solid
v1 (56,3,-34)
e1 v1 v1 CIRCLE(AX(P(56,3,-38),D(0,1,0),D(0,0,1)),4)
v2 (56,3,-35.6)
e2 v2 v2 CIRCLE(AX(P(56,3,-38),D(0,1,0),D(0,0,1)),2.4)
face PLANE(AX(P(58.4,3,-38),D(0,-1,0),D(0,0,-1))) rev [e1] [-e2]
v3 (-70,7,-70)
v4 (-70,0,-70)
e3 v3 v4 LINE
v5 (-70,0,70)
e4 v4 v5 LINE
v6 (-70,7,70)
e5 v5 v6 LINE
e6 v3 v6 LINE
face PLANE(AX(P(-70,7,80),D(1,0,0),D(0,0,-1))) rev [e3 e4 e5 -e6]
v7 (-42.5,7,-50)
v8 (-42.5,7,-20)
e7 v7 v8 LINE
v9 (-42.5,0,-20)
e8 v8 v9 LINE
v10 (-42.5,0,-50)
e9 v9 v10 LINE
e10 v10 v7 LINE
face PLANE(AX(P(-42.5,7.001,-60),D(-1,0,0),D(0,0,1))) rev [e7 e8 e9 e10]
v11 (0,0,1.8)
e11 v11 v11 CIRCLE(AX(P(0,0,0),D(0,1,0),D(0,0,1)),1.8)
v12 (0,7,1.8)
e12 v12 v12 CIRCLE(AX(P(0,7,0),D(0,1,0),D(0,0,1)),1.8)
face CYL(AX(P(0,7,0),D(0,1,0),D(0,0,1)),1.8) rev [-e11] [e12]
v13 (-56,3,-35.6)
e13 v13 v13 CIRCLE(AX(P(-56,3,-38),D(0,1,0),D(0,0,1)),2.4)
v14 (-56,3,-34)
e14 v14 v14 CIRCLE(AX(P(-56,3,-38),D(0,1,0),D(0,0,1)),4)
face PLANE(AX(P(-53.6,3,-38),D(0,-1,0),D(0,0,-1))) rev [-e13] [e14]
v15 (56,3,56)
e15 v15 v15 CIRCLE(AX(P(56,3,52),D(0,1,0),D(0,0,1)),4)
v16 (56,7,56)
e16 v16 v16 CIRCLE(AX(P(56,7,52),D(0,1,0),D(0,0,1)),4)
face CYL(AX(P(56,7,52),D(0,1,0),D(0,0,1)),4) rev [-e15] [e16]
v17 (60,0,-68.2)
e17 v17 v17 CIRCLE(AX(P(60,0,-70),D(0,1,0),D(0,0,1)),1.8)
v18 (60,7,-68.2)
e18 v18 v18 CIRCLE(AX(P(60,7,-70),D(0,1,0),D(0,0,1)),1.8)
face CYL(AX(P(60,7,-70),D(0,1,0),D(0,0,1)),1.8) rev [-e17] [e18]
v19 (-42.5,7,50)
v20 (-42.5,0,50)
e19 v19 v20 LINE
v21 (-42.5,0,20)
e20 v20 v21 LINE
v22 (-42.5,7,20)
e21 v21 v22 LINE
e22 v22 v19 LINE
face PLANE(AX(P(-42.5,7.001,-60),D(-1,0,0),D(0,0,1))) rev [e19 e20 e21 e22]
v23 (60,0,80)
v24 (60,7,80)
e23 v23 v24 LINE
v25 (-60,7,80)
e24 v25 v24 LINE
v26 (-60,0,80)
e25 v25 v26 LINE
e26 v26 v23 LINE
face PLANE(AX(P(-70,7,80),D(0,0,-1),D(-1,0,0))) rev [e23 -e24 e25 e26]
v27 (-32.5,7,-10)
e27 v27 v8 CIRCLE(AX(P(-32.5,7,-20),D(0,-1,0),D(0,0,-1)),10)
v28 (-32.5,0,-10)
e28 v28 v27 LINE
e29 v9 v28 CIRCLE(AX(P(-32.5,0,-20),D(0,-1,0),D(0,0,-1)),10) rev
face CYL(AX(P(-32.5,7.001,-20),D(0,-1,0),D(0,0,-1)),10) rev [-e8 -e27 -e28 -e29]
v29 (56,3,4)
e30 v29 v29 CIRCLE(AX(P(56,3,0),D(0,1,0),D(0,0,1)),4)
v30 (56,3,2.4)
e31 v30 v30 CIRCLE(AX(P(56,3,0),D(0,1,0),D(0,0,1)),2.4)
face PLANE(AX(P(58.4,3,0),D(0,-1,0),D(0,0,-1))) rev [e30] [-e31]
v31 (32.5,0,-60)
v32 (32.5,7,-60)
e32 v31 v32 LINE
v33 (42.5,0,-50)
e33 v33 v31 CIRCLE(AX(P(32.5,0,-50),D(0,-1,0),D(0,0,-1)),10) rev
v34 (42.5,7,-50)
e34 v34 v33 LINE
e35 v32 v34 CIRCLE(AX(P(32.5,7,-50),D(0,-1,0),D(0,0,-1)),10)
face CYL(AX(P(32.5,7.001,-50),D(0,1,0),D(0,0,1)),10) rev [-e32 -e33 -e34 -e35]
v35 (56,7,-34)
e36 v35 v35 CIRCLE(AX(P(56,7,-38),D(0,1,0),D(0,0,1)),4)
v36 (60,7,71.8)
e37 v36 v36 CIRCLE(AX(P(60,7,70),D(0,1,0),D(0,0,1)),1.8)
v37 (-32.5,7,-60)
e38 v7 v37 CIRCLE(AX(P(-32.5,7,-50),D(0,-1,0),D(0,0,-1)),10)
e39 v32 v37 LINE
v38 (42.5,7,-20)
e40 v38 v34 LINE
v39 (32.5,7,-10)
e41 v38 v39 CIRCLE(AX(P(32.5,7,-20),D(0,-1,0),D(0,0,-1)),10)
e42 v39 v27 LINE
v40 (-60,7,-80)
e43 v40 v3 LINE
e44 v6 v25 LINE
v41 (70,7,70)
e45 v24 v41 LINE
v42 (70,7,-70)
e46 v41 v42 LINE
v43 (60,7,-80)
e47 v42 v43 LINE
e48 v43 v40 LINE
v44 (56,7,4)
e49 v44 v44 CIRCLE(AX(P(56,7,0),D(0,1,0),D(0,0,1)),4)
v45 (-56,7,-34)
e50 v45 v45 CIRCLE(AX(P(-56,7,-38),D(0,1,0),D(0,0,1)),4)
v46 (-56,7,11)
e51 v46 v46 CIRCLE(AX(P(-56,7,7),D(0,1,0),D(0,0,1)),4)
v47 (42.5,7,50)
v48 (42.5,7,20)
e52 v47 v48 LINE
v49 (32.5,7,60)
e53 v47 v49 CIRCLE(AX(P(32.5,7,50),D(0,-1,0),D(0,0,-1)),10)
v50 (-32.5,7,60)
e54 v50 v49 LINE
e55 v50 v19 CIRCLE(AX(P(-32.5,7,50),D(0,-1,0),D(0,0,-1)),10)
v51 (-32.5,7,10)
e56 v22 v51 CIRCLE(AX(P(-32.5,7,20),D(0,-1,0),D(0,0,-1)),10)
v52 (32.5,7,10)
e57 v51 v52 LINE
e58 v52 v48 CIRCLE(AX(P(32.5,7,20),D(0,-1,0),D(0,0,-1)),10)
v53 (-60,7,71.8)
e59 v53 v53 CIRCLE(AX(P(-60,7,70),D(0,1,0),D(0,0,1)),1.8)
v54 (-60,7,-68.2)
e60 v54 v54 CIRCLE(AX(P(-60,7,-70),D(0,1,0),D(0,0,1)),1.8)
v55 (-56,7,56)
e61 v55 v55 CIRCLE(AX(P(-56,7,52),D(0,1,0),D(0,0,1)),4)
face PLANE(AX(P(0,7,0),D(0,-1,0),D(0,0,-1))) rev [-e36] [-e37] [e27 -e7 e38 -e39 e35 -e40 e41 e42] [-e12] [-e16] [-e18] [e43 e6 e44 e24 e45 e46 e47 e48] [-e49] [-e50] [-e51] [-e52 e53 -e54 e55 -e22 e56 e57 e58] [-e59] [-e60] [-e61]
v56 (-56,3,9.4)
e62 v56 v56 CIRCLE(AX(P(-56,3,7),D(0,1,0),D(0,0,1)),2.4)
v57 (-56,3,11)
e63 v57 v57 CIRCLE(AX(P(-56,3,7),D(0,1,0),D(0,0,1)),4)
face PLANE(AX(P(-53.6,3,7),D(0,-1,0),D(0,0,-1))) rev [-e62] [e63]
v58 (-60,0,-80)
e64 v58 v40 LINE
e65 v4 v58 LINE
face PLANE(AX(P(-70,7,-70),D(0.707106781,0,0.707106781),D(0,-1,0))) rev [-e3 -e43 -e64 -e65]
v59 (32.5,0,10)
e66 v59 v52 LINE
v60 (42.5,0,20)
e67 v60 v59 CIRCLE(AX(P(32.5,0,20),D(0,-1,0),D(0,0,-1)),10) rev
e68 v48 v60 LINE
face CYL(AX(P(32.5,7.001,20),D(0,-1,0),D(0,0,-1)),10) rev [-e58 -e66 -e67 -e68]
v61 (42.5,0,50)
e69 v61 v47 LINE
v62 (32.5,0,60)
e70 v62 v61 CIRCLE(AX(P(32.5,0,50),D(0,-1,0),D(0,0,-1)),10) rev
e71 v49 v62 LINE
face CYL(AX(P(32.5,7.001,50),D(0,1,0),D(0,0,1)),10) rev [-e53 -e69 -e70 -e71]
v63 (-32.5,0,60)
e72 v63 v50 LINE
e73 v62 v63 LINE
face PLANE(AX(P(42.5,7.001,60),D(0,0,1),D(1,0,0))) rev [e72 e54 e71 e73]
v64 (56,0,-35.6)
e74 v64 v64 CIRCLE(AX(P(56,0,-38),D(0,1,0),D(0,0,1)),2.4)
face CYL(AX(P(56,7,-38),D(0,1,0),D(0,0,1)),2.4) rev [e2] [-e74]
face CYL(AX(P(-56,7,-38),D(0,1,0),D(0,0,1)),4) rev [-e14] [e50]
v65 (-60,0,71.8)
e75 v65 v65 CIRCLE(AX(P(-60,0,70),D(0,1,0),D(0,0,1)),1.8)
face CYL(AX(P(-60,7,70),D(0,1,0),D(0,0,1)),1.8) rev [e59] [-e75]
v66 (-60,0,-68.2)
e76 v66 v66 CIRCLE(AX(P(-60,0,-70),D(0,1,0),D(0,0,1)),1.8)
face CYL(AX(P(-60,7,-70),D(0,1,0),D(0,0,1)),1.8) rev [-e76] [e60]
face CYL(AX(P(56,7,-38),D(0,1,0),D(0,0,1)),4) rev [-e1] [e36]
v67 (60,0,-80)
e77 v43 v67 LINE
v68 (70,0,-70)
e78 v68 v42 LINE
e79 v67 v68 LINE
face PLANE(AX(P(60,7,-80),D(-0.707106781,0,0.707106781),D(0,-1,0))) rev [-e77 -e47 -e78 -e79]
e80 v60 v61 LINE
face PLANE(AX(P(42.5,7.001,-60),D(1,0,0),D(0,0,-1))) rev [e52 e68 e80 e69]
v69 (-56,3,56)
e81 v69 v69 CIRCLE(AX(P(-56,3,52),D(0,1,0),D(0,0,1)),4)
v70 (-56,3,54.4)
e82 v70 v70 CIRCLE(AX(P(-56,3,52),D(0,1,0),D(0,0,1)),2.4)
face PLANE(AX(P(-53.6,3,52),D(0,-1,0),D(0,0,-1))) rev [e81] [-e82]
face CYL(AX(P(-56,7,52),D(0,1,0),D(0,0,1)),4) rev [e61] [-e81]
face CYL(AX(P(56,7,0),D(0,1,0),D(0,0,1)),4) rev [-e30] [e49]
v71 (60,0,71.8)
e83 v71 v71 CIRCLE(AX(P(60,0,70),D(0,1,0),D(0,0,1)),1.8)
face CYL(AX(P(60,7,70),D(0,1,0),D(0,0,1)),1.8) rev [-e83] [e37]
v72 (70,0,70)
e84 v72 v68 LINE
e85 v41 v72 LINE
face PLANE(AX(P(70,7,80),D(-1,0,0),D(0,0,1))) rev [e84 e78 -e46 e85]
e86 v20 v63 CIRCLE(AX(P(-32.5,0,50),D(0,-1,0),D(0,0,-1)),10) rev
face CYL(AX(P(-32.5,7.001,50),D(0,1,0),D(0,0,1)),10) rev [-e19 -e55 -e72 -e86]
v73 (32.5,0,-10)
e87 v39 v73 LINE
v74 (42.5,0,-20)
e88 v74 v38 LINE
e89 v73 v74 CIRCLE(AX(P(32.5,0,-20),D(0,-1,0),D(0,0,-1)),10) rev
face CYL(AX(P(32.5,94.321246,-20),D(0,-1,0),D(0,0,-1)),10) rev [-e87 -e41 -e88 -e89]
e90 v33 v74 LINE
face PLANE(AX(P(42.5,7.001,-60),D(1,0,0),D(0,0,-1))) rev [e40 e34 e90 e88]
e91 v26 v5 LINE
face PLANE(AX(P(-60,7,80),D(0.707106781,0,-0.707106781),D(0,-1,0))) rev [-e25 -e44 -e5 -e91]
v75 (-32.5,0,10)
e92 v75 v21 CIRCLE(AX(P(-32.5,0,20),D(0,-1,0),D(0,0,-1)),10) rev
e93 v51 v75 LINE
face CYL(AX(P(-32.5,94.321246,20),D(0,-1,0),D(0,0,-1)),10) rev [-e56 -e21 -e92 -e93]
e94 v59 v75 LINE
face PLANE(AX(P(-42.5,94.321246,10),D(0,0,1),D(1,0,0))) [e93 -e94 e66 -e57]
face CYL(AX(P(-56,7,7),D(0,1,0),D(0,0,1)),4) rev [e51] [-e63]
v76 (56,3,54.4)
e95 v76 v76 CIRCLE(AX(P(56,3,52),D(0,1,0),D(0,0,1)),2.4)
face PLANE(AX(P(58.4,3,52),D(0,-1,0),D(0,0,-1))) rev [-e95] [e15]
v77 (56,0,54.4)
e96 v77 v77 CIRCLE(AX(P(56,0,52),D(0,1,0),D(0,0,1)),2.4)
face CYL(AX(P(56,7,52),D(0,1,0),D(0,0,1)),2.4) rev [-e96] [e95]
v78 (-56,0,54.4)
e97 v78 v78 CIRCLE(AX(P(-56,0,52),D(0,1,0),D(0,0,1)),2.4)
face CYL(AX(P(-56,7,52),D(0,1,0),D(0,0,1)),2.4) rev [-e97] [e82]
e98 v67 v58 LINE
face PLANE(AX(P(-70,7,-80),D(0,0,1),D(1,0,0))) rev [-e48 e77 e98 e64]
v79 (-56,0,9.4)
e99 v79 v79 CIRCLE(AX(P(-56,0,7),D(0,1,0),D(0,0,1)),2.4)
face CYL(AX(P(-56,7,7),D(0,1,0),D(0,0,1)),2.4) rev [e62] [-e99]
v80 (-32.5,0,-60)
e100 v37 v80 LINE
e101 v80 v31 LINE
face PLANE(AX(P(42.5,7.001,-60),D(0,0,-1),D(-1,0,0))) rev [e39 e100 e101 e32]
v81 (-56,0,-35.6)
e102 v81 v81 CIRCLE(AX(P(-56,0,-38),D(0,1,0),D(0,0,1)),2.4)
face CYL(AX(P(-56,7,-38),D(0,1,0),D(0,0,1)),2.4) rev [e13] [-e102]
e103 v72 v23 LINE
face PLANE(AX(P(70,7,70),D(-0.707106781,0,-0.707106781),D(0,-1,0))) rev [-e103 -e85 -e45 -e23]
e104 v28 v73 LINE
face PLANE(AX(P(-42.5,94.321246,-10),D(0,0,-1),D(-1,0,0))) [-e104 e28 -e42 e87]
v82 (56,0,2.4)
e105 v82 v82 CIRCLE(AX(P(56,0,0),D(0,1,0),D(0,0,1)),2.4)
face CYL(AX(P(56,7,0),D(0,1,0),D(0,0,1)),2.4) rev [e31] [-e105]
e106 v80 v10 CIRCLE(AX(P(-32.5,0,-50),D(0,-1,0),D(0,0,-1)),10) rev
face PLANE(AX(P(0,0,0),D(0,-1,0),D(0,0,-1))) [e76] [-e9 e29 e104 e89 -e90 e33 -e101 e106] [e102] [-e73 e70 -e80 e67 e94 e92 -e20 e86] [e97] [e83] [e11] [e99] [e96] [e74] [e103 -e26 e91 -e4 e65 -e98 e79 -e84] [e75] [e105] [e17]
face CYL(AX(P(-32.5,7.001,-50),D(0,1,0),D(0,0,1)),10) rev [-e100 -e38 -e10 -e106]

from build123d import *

# Parameters (mm, degrees)
SKETCH1_W                      = 140
SKETCH1_H                      = 160
BOSS_EXTRUDE1_DEPTH            = 7
CBORE_FOR_M4_SHCS1_D           = 4.8
CBORE_FOR_M4_SHCS1_CBORE_D     = 8
CBORE_FOR_M4_SHCS1_CBORE_DEPTH = 4
CHAMFER1_SIZE                  = 10
CUT_EXTRUDE1_REACH             = 108.532
SKETCH8_W                      = 85
SKETCH8_H                      = 120
FILLET1_R                      = 10
SKETCH9_W                      = 85
SKETCH9_H                      = 20
BOSS_EXTRUDE3_DEPTH            = 7
FILLET2_R                      = 10
M3_CLEARANCE_HOLE1_OUTLINE_R   = 1.8
M3_CLEARANCE_HOLE1_DEPTH       = 7


# Read off the part's stored shape, not the designer's step: M3 Clearance Hole1
with BuildPart() as part:
    # Sketch1 → Boss-Extrude1 (new body)
    with BuildSketch(Plane(origin=(0, 0, 0), x_dir=(1, 0, 0), z_dir=(0, 1, 0))):
        Rectangle(SKETCH1_W, SKETCH1_H)
    extrude(amount=BOSS_EXTRUDE1_DEPTH)

    # CBORE for M4 SHCS1 (through all)
    with Locations(Plane(origin=(0, 7, 0), x_dir=(1, 0, 0), z_dir=(0, 1, 0))):
        with Locations((-56, 38), (56, 38), (-56, -7), (56, 0), (-56, -52), (56, -52)):
            CounterBoreHole(CBORE_FOR_M4_SHCS1_D / 2, CBORE_FOR_M4_SHCS1_CBORE_D / 2, CBORE_FOR_M4_SHCS1_CBORE_DEPTH)

    # Chamfer1
    chamfer1_edges = [part.edges().sort_by_distance(p)[0] for p in [
        (70, 3.5, 80),
        (-70, 3.5, 80),
        (-70, 3.5, -80),
        (70, 3.5, -80),
    ]]
    chamfer(chamfer1_edges, length=CHAMFER1_SIZE)

    # Sketch8 → Cut-Extrude1 (cut, up to next)
    with BuildSketch(Plane.XZ, mode=Mode.PRIVATE) as cut_extrude1_sk1:
        Rectangle(SKETCH8_W, SKETCH8_H)
    cut_extrude1_tool1 = extrude(cut_extrude1_sk1.sketch, amount=-CUT_EXTRUDE1_REACH, mode=Mode.PRIVATE) & part.part
    add(cut_extrude1_tool1.solids().sort_by_distance((0, 0, 0))[0], mode=Mode.SUBTRACT)

    # Fillet1
    fillet1_edges = [part.edges().sort_by_distance(p)[0] for p in [
        (-42.5, 3.5, -60),
        (-42.5, 3.5, 60),
        (42.5, 3.5, 60),
        (42.5, 3.5, -60),
    ]]
    fillet(fillet1_edges, radius=FILLET1_R)

    # Sketch9 → Boss-Extrude3 (add)
    with BuildSketch(Plane.XZ):
        Rectangle(SKETCH9_W, SKETCH9_H)
    extrude(amount=-BOSS_EXTRUDE3_DEPTH)

    # Fillet2
    fillet2_edges = [part.edges().sort_by_distance(p)[0] for p in [
        (42.5, 3.5, 10),
        (42.5, 3.5, -10),
        (-42.5, 3.5, -10),
        (-42.5, 3.5, 10),
    ]]
    fillet(fillet2_edges, radius=FILLET2_R)

    # M3 Clearance Hole1 outline → M3 Clearance Hole1 (cut)
    with BuildSketch(Plane(origin=(0, 0, 0), x_dir=(1, 0, 0), z_dir=(0, 1, 0))):
        with Locations((60, -70)):
            Circle(M3_CLEARANCE_HOLE1_OUTLINE_R)
        with Locations((-60, 70)):
            Circle(M3_CLEARANCE_HOLE1_OUTLINE_R)
        with Locations((-60, -70)):
            Circle(M3_CLEARANCE_HOLE1_OUTLINE_R)
        with Locations((60, 70)):
            Circle(M3_CLEARANCE_HOLE1_OUTLINE_R)
        Circle(M3_CLEARANCE_HOLE1_OUTLINE_R)
    extrude(amount=M3_CLEARANCE_HOLE1_DEPTH, mode=Mode.SUBTRACT)


solid = part.part
